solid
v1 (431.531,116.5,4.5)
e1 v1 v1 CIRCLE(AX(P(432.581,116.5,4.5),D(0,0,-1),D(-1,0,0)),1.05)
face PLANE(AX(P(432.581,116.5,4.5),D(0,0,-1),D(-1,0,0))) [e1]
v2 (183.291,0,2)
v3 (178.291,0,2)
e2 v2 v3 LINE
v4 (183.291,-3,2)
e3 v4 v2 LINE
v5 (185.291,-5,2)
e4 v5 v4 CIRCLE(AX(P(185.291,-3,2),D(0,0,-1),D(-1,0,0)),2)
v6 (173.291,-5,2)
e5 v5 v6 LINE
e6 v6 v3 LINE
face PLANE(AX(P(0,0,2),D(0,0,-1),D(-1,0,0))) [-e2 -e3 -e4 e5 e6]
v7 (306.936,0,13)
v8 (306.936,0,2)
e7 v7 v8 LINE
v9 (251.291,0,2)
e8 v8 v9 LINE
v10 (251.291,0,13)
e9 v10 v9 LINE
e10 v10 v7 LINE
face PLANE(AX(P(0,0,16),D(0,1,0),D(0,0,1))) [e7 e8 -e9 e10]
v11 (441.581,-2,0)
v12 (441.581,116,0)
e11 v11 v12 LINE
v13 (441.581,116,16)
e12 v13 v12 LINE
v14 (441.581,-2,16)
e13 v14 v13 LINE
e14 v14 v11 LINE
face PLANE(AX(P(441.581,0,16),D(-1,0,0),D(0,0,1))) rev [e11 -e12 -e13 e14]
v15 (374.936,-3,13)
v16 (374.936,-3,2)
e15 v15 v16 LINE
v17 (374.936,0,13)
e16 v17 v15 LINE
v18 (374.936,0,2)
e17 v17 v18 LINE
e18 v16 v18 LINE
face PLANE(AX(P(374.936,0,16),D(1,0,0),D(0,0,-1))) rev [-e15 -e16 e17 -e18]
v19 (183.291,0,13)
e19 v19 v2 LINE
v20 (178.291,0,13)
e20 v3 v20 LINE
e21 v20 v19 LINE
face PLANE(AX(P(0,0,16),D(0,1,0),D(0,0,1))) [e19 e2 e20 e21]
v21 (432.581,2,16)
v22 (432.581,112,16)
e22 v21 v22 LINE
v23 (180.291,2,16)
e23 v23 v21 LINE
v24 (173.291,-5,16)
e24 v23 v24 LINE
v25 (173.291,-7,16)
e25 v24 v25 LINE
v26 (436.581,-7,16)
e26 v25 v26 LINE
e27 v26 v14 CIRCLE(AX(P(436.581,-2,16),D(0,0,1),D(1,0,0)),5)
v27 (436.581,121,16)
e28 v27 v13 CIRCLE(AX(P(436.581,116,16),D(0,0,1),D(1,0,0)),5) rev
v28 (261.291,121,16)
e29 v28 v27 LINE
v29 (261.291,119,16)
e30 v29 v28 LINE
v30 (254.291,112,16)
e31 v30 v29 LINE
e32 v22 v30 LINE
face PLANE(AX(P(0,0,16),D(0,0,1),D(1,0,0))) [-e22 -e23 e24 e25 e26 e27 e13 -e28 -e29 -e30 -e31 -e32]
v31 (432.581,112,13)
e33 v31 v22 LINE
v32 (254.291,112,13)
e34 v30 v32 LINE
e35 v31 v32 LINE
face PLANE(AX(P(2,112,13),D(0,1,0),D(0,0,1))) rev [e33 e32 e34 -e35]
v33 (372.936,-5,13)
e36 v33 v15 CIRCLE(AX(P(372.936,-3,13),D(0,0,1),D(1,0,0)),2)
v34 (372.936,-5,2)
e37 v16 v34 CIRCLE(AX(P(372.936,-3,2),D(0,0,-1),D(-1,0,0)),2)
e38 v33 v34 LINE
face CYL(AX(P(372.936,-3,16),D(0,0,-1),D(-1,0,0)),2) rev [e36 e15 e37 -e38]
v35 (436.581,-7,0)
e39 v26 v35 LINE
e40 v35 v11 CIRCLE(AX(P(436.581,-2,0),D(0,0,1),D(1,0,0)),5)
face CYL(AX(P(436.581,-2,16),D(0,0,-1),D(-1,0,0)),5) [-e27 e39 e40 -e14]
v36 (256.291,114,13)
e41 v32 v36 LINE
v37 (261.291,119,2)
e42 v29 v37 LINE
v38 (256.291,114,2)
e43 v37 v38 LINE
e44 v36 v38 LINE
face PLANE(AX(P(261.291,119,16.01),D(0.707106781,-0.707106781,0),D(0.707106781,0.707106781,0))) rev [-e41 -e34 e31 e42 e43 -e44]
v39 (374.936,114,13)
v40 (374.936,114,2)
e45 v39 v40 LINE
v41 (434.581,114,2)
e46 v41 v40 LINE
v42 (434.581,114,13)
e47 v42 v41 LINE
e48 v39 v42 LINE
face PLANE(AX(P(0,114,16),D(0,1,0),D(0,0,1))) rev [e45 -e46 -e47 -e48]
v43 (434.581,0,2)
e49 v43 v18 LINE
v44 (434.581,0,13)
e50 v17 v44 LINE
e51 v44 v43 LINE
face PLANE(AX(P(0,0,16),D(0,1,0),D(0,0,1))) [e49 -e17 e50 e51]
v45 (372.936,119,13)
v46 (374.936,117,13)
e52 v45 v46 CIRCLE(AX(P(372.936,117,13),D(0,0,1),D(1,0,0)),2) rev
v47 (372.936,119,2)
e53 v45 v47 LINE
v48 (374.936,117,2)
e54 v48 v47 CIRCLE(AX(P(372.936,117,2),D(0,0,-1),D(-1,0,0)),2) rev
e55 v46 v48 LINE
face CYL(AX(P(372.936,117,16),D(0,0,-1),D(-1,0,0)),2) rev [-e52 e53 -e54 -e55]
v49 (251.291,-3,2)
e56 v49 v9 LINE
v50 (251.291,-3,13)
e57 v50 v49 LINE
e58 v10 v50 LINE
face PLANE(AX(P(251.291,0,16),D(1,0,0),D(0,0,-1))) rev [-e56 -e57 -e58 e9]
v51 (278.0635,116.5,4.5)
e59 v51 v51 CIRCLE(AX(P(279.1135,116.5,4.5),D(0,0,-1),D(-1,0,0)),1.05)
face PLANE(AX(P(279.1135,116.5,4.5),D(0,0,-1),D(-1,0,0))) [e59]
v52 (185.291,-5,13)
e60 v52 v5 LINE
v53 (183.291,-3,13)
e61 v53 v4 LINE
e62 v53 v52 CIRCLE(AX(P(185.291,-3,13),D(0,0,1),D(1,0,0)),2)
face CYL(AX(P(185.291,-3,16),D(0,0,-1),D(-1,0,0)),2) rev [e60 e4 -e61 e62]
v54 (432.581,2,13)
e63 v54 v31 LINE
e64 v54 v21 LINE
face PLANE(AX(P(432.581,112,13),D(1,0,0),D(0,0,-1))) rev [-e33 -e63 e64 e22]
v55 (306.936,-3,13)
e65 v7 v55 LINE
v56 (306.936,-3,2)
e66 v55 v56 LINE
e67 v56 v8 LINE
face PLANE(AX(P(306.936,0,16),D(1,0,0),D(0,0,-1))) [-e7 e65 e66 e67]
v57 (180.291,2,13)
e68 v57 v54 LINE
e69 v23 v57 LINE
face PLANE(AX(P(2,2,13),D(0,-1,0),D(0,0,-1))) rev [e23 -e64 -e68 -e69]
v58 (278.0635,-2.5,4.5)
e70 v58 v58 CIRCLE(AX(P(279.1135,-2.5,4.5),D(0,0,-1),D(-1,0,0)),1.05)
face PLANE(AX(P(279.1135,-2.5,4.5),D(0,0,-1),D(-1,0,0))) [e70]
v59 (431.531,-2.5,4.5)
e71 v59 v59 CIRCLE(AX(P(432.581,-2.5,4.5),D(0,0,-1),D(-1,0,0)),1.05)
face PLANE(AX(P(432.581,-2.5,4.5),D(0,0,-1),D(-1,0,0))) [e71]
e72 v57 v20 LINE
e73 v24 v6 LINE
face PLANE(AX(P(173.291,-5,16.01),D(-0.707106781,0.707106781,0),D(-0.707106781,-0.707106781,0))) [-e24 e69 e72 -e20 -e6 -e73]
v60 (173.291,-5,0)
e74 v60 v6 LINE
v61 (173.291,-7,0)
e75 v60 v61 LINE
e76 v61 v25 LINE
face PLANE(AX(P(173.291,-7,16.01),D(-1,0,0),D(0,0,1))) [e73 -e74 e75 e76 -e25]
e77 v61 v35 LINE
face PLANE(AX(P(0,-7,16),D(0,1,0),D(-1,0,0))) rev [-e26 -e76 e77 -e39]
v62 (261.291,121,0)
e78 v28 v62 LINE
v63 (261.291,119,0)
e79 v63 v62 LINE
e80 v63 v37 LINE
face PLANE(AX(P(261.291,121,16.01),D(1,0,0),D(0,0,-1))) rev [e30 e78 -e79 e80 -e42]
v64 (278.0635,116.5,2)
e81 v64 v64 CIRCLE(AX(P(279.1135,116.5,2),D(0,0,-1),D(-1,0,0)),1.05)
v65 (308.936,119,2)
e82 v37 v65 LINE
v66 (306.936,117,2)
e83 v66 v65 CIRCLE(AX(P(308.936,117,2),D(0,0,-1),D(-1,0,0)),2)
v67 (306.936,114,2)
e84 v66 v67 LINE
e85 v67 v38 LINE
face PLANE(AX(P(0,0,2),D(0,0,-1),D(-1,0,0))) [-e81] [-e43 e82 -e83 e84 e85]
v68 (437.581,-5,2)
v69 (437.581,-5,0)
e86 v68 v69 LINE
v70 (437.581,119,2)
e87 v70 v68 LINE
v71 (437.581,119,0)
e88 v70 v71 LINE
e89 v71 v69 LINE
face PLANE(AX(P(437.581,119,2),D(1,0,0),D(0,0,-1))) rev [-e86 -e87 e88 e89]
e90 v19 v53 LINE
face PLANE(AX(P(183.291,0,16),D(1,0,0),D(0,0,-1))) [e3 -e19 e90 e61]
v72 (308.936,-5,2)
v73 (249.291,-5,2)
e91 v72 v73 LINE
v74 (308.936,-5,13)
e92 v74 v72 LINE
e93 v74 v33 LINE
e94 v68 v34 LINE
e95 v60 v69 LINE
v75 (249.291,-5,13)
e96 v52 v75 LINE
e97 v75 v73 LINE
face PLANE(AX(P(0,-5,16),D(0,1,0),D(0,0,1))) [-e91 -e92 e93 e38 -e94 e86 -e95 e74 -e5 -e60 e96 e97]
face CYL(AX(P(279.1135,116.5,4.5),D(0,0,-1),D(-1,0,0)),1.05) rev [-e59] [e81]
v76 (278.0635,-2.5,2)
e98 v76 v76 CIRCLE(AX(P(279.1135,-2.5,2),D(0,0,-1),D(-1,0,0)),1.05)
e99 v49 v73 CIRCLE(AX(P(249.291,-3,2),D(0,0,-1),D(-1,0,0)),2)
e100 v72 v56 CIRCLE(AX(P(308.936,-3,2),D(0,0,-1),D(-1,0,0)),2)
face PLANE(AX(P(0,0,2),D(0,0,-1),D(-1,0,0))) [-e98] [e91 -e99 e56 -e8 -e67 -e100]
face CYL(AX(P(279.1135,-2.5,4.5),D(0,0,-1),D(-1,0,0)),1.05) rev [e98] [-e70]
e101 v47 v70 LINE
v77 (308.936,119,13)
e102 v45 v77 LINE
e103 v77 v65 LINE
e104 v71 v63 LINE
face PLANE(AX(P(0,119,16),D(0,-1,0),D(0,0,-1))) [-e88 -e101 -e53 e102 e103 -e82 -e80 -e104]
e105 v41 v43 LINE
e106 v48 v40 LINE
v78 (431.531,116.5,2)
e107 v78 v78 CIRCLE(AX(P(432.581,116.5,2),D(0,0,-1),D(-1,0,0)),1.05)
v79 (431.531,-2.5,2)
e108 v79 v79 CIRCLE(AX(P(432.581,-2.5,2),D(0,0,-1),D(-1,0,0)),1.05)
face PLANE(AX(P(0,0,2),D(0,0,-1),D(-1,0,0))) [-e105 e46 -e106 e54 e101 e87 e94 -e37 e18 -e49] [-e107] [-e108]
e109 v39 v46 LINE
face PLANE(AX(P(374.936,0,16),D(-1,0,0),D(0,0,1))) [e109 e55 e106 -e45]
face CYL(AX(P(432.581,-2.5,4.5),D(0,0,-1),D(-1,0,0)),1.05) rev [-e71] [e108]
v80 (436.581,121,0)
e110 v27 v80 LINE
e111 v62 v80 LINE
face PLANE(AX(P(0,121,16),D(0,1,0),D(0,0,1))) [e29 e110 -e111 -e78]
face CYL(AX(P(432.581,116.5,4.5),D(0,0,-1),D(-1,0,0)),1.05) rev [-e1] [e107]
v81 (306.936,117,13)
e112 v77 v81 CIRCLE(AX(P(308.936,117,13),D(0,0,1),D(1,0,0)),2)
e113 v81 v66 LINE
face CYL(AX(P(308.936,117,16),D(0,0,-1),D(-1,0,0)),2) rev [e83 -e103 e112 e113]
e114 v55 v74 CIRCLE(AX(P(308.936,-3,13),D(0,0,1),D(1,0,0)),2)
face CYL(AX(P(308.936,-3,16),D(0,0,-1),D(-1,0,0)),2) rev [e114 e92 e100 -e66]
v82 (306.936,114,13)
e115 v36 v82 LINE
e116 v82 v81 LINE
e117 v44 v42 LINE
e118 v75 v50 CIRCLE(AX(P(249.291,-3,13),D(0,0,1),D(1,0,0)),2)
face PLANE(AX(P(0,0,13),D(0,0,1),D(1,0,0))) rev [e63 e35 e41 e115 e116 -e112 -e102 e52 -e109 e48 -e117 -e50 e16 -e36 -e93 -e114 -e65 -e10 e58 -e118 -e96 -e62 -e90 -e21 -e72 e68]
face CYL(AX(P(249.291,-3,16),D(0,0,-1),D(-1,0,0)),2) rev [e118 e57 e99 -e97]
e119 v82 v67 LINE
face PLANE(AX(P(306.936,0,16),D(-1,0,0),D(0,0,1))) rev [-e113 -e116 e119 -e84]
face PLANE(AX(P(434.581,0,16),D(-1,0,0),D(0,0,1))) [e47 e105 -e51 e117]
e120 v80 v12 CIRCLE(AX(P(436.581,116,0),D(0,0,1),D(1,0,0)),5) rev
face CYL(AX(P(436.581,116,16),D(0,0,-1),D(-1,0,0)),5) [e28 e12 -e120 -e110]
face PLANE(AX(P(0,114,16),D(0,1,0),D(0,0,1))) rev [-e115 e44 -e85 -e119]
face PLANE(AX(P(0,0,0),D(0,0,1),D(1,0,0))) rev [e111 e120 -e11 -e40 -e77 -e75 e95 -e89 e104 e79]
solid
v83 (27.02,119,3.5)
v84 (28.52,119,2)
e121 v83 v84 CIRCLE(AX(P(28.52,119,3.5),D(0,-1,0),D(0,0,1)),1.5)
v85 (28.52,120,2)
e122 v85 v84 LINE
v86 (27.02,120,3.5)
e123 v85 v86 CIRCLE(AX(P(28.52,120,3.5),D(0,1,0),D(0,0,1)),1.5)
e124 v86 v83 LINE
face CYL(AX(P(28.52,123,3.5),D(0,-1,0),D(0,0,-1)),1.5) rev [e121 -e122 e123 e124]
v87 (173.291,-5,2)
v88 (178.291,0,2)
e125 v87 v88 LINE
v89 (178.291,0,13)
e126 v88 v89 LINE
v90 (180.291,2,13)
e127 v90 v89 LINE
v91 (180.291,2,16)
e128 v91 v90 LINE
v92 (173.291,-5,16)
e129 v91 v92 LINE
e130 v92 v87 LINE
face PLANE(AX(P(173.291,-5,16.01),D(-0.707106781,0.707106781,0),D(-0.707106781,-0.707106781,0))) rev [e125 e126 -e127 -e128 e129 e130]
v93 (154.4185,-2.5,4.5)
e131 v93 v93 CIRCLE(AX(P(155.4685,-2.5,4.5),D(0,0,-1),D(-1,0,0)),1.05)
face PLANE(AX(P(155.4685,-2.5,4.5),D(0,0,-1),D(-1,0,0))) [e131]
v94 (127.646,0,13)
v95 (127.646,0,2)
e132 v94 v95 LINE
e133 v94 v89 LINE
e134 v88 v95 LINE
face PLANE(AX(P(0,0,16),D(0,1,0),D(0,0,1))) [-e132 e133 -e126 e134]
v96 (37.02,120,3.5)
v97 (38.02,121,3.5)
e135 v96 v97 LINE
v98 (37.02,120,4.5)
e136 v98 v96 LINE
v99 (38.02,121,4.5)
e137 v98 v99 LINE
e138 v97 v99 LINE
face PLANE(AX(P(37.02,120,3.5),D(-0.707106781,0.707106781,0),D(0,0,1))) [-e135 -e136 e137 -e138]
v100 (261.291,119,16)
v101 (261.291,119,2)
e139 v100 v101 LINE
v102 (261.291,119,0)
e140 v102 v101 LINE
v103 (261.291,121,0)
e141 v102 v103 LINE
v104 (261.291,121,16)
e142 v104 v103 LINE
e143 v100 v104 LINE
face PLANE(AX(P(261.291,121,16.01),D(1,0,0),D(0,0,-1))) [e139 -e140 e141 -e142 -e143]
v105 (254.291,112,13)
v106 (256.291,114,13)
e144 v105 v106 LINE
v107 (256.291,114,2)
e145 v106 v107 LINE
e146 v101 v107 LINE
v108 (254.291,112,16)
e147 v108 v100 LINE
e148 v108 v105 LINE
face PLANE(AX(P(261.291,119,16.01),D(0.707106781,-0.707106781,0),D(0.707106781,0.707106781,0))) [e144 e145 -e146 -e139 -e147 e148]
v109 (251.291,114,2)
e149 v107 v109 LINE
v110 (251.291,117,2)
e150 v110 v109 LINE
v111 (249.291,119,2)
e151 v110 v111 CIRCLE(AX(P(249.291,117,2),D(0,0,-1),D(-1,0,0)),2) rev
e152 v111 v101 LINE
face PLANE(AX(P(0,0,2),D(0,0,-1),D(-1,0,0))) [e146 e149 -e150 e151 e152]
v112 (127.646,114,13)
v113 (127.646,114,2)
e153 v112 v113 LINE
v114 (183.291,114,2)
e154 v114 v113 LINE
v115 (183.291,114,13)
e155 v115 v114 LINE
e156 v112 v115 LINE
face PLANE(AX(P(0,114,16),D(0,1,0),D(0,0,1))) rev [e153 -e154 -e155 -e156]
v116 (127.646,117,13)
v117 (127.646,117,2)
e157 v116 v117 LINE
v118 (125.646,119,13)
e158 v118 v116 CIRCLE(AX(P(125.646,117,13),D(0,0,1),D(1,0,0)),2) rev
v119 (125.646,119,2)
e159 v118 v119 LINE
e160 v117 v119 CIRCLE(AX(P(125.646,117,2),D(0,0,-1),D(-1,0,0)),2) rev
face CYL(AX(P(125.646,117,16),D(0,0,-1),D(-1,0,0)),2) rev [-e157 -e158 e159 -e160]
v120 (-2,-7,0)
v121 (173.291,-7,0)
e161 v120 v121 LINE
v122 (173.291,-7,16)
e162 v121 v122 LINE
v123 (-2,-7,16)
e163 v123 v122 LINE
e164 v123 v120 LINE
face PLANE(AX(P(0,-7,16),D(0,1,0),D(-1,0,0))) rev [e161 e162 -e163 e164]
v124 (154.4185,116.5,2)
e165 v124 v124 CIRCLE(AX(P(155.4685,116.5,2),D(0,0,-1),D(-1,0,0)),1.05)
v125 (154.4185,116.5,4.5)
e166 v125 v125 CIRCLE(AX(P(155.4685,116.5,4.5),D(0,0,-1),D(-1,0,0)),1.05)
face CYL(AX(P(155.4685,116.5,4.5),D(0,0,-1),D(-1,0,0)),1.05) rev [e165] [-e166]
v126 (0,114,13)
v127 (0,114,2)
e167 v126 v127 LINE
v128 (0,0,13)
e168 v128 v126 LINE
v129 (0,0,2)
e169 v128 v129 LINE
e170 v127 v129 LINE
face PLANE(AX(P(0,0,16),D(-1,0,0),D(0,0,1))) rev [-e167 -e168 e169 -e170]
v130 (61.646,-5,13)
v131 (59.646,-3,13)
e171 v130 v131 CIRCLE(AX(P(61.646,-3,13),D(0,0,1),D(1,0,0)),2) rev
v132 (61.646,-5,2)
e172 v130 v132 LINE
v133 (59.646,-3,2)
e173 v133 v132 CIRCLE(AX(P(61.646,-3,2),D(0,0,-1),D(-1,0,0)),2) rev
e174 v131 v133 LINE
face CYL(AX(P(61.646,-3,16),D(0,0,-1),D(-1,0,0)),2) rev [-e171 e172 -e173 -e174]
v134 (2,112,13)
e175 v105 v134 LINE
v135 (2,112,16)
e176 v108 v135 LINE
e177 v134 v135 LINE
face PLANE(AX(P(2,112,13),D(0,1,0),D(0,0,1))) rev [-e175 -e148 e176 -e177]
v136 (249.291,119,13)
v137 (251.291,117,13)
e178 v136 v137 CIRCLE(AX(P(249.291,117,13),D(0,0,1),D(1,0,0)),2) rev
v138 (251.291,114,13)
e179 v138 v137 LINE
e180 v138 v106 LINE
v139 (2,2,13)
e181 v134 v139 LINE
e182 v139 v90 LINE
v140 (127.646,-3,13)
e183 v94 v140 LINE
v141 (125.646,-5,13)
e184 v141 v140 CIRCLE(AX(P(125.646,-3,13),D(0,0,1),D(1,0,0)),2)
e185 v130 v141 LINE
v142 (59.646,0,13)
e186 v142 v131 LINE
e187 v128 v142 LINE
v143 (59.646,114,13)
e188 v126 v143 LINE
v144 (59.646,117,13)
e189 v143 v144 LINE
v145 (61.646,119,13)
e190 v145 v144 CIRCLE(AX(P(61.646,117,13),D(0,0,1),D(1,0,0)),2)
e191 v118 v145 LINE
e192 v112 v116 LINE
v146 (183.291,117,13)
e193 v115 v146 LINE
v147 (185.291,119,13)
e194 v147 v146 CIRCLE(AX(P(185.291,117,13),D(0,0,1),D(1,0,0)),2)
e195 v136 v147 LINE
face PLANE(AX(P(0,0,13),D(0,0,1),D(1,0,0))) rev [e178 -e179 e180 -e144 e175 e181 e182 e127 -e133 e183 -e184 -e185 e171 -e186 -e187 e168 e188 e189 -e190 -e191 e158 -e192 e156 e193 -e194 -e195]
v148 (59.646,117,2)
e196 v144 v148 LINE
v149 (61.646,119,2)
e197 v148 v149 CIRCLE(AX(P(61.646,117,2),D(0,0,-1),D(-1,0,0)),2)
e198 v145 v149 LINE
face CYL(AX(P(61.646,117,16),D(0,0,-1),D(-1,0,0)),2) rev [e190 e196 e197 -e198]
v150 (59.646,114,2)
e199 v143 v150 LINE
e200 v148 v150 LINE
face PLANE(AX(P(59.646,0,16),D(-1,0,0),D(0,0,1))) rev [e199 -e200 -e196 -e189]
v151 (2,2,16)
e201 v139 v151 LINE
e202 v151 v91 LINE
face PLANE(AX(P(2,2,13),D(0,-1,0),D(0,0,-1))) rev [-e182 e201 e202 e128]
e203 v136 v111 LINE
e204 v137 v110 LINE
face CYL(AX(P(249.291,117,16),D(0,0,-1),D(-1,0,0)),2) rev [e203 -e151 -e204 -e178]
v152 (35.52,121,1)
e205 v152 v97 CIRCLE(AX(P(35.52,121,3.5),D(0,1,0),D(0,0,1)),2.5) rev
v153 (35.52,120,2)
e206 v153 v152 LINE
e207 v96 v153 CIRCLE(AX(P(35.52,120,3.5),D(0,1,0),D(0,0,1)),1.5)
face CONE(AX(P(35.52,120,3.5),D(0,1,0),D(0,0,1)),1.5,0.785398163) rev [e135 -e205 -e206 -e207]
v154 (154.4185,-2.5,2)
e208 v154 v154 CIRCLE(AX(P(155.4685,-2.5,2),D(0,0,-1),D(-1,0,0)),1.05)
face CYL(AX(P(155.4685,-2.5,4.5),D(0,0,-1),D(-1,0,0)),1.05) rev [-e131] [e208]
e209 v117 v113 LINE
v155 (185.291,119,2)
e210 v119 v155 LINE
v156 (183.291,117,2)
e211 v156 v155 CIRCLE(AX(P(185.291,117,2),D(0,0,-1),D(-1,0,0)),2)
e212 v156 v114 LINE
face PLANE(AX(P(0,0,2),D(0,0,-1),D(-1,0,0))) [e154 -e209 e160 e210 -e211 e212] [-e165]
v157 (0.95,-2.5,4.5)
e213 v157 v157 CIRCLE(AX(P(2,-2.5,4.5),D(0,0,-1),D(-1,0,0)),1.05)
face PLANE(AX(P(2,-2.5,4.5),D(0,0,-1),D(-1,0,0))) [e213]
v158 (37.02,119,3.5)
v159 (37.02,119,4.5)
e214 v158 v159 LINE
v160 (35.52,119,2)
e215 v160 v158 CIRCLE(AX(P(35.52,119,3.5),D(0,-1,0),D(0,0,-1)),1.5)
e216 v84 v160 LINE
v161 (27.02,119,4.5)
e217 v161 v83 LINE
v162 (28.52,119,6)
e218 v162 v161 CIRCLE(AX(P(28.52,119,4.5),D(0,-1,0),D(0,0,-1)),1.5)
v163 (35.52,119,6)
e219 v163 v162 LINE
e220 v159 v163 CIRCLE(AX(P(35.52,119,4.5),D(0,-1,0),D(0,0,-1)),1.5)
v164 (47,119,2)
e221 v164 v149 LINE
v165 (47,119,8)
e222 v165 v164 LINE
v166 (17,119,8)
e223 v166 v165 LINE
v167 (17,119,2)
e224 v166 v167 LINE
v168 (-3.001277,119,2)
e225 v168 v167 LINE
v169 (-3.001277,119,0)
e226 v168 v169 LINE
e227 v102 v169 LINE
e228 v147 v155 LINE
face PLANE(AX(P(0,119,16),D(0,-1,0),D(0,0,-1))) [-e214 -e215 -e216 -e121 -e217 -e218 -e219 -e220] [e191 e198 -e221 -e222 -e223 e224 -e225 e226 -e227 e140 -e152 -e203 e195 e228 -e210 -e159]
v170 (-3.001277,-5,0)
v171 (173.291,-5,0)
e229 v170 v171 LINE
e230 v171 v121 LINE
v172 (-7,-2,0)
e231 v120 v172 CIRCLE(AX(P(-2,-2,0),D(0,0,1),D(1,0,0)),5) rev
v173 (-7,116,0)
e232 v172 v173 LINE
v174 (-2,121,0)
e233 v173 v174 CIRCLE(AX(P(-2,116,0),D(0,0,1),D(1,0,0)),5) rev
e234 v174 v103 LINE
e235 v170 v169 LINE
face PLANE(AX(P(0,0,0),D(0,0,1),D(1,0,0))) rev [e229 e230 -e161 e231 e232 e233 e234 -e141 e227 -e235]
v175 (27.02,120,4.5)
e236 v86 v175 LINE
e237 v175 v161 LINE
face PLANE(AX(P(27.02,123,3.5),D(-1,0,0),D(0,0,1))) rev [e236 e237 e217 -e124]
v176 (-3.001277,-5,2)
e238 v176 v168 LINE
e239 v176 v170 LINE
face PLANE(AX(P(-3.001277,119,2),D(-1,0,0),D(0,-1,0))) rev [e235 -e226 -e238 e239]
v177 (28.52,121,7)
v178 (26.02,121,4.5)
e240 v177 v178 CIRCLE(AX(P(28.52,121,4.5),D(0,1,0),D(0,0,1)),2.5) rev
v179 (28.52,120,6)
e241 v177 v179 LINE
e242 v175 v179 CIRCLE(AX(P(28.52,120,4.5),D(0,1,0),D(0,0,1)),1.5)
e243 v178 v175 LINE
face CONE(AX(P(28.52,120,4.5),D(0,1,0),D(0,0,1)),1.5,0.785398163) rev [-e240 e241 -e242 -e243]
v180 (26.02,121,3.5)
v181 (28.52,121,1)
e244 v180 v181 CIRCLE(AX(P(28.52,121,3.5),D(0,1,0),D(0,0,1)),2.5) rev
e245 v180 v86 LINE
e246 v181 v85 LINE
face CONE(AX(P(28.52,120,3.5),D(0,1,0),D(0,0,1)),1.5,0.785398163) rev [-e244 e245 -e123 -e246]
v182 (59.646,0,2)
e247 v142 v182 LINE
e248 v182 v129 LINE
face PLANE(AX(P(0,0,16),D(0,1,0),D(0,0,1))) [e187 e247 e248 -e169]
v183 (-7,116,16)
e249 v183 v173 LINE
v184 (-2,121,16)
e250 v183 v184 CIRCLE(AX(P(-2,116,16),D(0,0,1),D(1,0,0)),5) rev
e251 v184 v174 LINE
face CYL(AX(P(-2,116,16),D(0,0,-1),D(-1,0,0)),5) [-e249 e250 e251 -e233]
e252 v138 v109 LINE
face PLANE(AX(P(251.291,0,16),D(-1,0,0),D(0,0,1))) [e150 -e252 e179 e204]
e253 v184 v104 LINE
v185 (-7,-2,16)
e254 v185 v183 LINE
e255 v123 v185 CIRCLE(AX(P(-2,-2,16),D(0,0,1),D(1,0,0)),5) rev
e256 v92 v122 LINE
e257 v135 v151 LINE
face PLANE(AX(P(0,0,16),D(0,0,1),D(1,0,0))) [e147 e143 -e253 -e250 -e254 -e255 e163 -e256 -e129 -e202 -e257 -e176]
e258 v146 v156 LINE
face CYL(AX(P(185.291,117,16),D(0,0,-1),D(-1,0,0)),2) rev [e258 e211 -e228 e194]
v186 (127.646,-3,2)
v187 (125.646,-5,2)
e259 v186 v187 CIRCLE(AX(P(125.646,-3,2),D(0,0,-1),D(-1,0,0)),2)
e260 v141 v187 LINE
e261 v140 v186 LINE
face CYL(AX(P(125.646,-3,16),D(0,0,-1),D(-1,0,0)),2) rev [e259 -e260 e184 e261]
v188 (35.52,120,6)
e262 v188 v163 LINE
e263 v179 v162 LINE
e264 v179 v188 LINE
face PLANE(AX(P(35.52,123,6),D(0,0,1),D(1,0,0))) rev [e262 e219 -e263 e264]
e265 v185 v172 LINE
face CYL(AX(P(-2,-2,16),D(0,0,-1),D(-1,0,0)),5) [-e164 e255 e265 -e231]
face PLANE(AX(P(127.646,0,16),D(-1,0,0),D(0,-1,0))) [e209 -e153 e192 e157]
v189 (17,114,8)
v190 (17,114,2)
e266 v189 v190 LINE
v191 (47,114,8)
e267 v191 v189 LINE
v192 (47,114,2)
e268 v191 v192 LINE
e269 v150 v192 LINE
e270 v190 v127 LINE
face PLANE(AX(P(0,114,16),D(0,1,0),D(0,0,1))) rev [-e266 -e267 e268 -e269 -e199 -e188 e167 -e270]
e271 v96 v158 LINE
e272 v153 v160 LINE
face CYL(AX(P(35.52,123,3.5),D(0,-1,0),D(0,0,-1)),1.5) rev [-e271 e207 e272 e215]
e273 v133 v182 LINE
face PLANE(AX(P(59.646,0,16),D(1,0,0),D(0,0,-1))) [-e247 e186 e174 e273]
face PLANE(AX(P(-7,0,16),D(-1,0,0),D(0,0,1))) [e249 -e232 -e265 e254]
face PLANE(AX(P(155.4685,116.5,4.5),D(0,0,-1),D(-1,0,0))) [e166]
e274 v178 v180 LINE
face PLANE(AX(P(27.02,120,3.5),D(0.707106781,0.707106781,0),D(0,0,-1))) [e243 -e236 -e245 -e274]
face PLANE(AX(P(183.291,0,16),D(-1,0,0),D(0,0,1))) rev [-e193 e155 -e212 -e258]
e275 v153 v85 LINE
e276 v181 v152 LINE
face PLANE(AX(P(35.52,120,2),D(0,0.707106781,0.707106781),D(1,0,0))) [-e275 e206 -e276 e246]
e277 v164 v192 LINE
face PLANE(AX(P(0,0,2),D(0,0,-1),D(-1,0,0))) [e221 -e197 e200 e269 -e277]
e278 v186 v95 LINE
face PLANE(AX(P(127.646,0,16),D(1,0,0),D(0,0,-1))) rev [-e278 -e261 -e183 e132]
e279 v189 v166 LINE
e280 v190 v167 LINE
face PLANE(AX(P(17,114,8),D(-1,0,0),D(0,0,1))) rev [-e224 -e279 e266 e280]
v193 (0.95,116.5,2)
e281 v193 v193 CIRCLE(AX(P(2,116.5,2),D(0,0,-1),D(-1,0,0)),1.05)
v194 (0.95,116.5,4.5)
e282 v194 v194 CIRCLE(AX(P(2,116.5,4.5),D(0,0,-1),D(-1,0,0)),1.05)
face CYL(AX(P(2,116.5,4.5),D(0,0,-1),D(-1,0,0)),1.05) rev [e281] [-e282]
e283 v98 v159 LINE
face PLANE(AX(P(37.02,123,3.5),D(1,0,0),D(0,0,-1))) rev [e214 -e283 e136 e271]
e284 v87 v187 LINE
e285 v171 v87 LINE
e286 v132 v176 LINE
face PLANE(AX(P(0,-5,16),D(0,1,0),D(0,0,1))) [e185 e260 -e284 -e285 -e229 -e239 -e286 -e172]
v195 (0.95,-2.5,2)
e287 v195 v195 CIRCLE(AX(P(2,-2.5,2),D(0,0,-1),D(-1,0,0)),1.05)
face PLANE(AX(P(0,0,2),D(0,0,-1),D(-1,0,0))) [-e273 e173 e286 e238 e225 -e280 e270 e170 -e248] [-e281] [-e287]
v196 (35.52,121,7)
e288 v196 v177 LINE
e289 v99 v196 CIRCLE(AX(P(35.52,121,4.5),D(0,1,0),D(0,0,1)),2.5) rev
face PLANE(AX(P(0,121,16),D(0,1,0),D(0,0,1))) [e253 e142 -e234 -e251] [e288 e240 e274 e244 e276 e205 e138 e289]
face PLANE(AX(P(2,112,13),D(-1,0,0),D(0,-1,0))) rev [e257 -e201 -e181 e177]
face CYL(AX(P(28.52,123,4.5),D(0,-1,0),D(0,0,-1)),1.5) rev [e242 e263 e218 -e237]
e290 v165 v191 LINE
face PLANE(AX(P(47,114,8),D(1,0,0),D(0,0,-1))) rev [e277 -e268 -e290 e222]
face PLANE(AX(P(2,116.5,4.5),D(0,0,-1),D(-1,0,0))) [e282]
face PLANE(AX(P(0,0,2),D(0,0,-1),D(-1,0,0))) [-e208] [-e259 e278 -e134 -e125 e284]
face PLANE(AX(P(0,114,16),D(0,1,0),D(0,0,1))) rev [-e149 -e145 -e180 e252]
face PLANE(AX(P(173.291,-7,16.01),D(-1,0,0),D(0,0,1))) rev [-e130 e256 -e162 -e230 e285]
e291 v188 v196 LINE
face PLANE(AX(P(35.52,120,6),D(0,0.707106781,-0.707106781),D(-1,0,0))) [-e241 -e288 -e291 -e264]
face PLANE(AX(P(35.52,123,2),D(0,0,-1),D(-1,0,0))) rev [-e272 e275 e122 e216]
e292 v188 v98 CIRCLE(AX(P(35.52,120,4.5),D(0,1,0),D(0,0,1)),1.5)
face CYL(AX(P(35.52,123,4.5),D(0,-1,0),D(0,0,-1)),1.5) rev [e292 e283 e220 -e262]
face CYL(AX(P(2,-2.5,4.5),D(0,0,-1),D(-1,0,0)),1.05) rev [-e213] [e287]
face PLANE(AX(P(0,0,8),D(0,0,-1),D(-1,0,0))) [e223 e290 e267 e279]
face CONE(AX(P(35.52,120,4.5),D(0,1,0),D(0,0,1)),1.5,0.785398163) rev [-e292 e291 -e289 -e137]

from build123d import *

# Parameters (mm, degrees)
BOSS_EXTRUDE1_DEPTH = 16
SKETCH2_W           = 438.581
SKETCH2_H           = 128
SKETCH2_W_2         = 430.581
SKETCH2_H_2         = 110
BOSS_EXTRUDE2_DEPTH = 3
SKETCH3_W           = 440.5822769
SKETCH3_H           = 124
CUT_EXTRUDE1_DEPTH  = 2
SKETCH4_R           = 1.05
CUT_EXTRUDE2_DEPTH  = 2.5
SKETCH5_W           = 30
SKETCH5_H           = 5
CUT_EXTRUDE3_DEPTH  = 6
CUT_EXTRUDE4_DEPTH  = 4
CHAMFER8_SIZE       = 1
SPLIT1_DEPTH        = 16
SPLIT1_START        = 2
SPLIT1_2_OUTLINE_R  = 1.05
SPLIT1_2_DEPTH      = 14
SPLIT1_START_2      = 13
SPLIT1_3_OUTLINE_R  = 1.05
SPLIT1_3_DEPTH      = 3
SPLIT1_4_DEPTH      = 3.5
SPLIT1_START_3      = 8
SPLIT1_5_OUTLINE_R  = 1.05
SPLIT1_5_DEPTH      = 5
SPLIT1_START_4      = 4.5
SPLIT1_6_OUTLINE_R  = 1.05
SPLIT1_6_DEPTH      = 3.5
SPLIT1_START_5      = 118
SPLIT1_7_DEPTH      = 4


with BuildPart() as part:
    # Sketch1 → Boss-Extrude1 (new body)
    with BuildSketch(Plane.XY):
        with BuildLine():
            ThreePointArc((-7, -2), (-5.535533906, -5.535533906), (-2, -7))
            Line((-2, -7), (436.581, -7))
            ThreePointArc((436.581, -7), (440.116533906, -5.535533906), (441.581, -2))
            Line((441.581, -2), (441.581, 116))
            ThreePointArc((441.581, 116), (440.116533906, 119.535533906), (436.581, 121))
            Line((436.581, 121), (-2, 121))
            ThreePointArc((-2, 121), (-5.535533906, 119.535533906), (-7, 116))
            Line((-7, 116), (-7, -2))
        make_face()
        with BuildLine():
            Line((251.291, 114), (306.936, 114))
            Line((306.936, 114), (306.936, 117))
            ThreePointArc((306.936, 117), (307.521786438, 118.414213562), (308.936, 119))
            Line((308.936, 119), (372.936, 119))
            ThreePointArc((372.936, 119), (374.350213562, 118.414213562), (374.936, 117))
            Line((374.936, 117), (374.936, 114))
            Line((374.936, 114), (434.581, 114))
            Line((434.581, 114), (434.581, 0))
            Line((434.581, 0), (374.936, 0))
            Line((374.936, 0), (374.936, -3))
            ThreePointArc((374.936, -3), (374.350213562, -4.414213562), (372.936, -5))
            Line((372.936, -5), (308.936, -5))
            ThreePointArc((308.936, -5), (307.521786438, -4.414213562), (306.936, -3))
            Line((306.936, -3), (306.936, 0))
            Line((306.936, 0), (251.291, 0))
            Line((251.291, 0), (251.291, -3))
            ThreePointArc((251.291, -3), (250.705213562, -4.414213562), (249.291, -5))
            Line((249.291, -5), (185.291, -5))
            ThreePointArc((185.291, -5), (183.876786438, -4.414213562), (183.291, -3))
            Line((183.291, -3), (183.291, 0))
            Line((183.291, 0), (127.646, 0))
            Line((127.646, 0), (127.646, -3))
            ThreePointArc((127.646, -3), (127.060213562, -4.414213562), (125.646, -5))
            Line((125.646, -5), (61.646, -5))
            ThreePointArc((61.646, -5), (60.231786438, -4.414213562), (59.646, -3))
            Line((59.646, -3), (59.646, 0))
            Line((59.646, 0), (0, 0))
            Line((0, 0), (0, 114))
            Line((0, 114), (59.646, 114))
            Line((59.646, 114), (59.646, 117))
            ThreePointArc((59.646, 117), (60.231786438, 118.414213562), (61.646, 119))
            Line((61.646, 119), (125.646, 119))
            ThreePointArc((125.646, 119), (127.060213562, 118.414213562), (127.646, 117))
            Line((127.646, 117), (127.646, 114))
            Line((127.646, 114), (183.291, 114))
            Line((183.291, 114), (183.291, 117))
            ThreePointArc((183.291, 117), (183.876786438, 118.414213562), (185.291, 119))
            Line((185.291, 119), (249.291, 119))
            ThreePointArc((249.291, 119), (250.705213562, 118.414213562), (251.291, 117))
            Line((251.291, 117), (251.291, 114))
        make_face(mode=Mode.SUBTRACT)
    extrude(amount=BOSS_EXTRUDE1_DEPTH)

    # Sketch2 → Boss-Extrude2 (add)
    with BuildSketch(Plane.XY.offset(16)):
        with Locations((217.2905, 57)):
            Rectangle(SKETCH2_W, SKETCH2_H)
        with Locations((217.2905, 57)):
            Rectangle(SKETCH2_W_2, SKETCH2_H_2, mode=Mode.SUBTRACT)
    extrude(amount=-BOSS_EXTRUDE2_DEPTH)

    # Sketch3 → Cut-Extrude1 (cut)
    with BuildSketch(Plane(origin=(0, 0, 0), x_dir=(-1, 0, 0), z_dir=(0, 0, -1))):
        with Locations((-217.28986155, 57)):
            Rectangle(SKETCH3_W, SKETCH3_H)
    extrude(amount=-CUT_EXTRUDE1_DEPTH, mode=Mode.SUBTRACT)

    # Sketch4 → Cut-Extrude2 (cut)
    with BuildSketch(Plane(origin=(0, 0, 2), x_dir=(-1, 0, 0), z_dir=(0, 0, -1))):
        with Locations((-279.1135, 116.5)):
            Circle(SKETCH4_R)
        with Locations((-155.4685, 116.5)):
            Circle(SKETCH4_R)
        with Locations((-279.1135, -2.5)):
            Circle(SKETCH4_R)
        with Locations((-155.4685, -2.5)):
            Circle(SKETCH4_R)
        with Locations((-2, -2.5)):
            Circle(SKETCH4_R)
        with Locations((-2, 116.5)):
            Circle(SKETCH4_R)
        with Locations((-432.581, 116.5)):
            Circle(SKETCH4_R)
        with Locations((-432.581, -2.5)):
            Circle(SKETCH4_R)
    extrude(amount=-CUT_EXTRUDE2_DEPTH, mode=Mode.SUBTRACT)

    # Sketch5 → Cut-Extrude3 (cut)
    with BuildSketch(Plane(origin=(0, 0, 2), x_dir=(-1, 0, 0), z_dir=(0, 0, -1))):
        with Locations((-32, 116.5)):
            Rectangle(SKETCH5_W, SKETCH5_H)
    extrude(amount=-CUT_EXTRUDE3_DEPTH, mode=Mode.SUBTRACT)

    # Sketch6 → Cut-Extrude4 (cut)
    with BuildSketch(Plane.XZ.offset(-119)):
        with BuildLine():
            Line((35.52, 2), (28.52, 2))
            ThreePointArc((28.52, 2), (27.459339828, 2.439339828), (27.02, 3.5))
            Line((27.02, 3.5), (27.02, 4.5))
            ThreePointArc((27.02, 4.5), (27.459339828, 5.560660172), (28.52, 6))
            Line((28.52, 6), (35.52, 6))
            ThreePointArc((35.52, 6), (36.580660172, 5.560660172), (37.02, 4.5))
            Line((37.02, 4.5), (37.02, 3.5))
            ThreePointArc((37.02, 3.5), (36.580660172, 2.439339828), (35.52, 2))
        make_face()
    extrude(amount=-CUT_EXTRUDE4_DEPTH, mode=Mode.SUBTRACT)

    # Chamfer8
    chamfer8_edges = [part.edges().sort_by_distance(p)[0] for p in [
        (32.02, 121, 6),
        (27.459339828, 121, 5.560660172),
        (27.02, 121, 4),
        (27.459339828, 121, 2.439339828),
        (32.02, 121, 2),
        (36.580660172, 121, 2.439339828),
        (37.02, 121, 4),
        (36.580660172, 121, 5.560660172),
    ]]
    chamfer(chamfer8_edges, length=CHAMFER8_SIZE)

    # Split1: read off the stored shape, not the designer's step
    # Split1 outline → Split1 (cut)
    with BuildSketch(Plane.XY):
        with BuildLine():
            Line((261.291, 121), (-2, 121))
            ThreePointArc((-2, 121), (-5.535533906, 119.535533906), (-7, 116))
            Line((-7, 116), (-7, -2))
            ThreePointArc((-7, -2), (-5.535533906, -5.535533906), (-2, -7))
            Line((-2, -7), (173.291, -7))
            Line((173.291, -7), (173.291, -5))
            Line((173.291, -5), (180.291, 2))
            Line((180.291, 2), (2, 2))
            Line((2, 2), (2, 112))
            Line((2, 112), (254.291, 112))
            Line((254.291, 112), (261.291, 119))
            Line((261.291, 119), (261.291, 121))
        make_face()
    extrude(amount=SPLIT1_DEPTH, mode=Mode.SUBTRACT)


with BuildPart() as body_2:
    # Split1 2 outline → Split1 2 (new body)
    # profile 1 of 2: a face of its own
    with BuildSketch(Plane.XY.offset(SPLIT1_START)):
        with BuildLine():
            ThreePointArc((127.646, -3), (127.060213562, -4.414213562), (125.646, -5))
            Line((125.646, -5), (61.646, -5))
            ThreePointArc((61.646, -5), (60.231786438, -4.414213562), (59.646, -3))
            Line((59.646, -3), (59.646, 0))
            Line((59.646, 0), (0, 0))
            Line((0, 0), (0, 114))
            Line((0, 114), (17, 114))
            Line((17, 114), (17, 119))
            Line((17, 119), (27.02, 119))
            Line((27.02, 119), (27.02, 120))
            Line((27.02, 120), (26.02, 121))
            Line((26.02, 121), (-2, 121))
            ThreePointArc((-2, 121), (-5.535533906, 119.535533906), (-7, 116))
            Line((-7, 116), (-7, -2))
            ThreePointArc((-7, -2), (-5.535533906, -5.535533906), (-2, -7))
            Line((-2, -7), (173.291, -7))
            Line((173.291, -7), (173.291, -5))
            Line((173.291, -5), (178.291, 0))
            Line((178.291, 0), (127.646, 0))
            Line((127.646, 0), (127.646, -3))
        make_face()
        with Locations((155.4685, -2.5)):
            Circle(SPLIT1_2_OUTLINE_R, mode=Mode.SUBTRACT)
        with Locations((2, -2.5)):
            Circle(SPLIT1_2_OUTLINE_R, mode=Mode.SUBTRACT)
        with Locations((2, 116.5)):
            Circle(SPLIT1_2_OUTLINE_R, mode=Mode.SUBTRACT)
    # profile 2 of 2: a face of its own
    with BuildSketch(Plane.XY.offset(SPLIT1_START)):
        with BuildLine():
            Line((251.291, 114), (256.291, 114))
            Line((256.291, 114), (261.291, 119))
            Line((261.291, 119), (261.291, 121))
            Line((261.291, 121), (38.02, 121))
            Line((38.02, 121), (37.02, 120))
            Line((37.02, 120), (37.02, 119))
            Line((37.02, 119), (47, 119))
            Line((47, 119), (47, 114))
            Line((47, 114), (59.646, 114))
            Line((59.646, 114), (59.646, 117))
            ThreePointArc((59.646, 117), (60.231786438, 118.414213562), (61.646, 119))
            Line((61.646, 119), (125.646, 119))
            ThreePointArc((125.646, 119), (127.060213562, 118.414213562), (127.646, 117))
            Line((127.646, 117), (127.646, 114))
            Line((127.646, 114), (183.291, 114))
            Line((183.291, 114), (183.291, 117))
            ThreePointArc((183.291, 117), (183.876786438, 118.414213562), (185.291, 119))
            Line((185.291, 119), (249.291, 119))
            ThreePointArc((249.291, 119), (250.705213562, 118.414213562), (251.291, 117))
            Line((251.291, 117), (251.291, 114))
        make_face()
        with Locations((155.4685, 116.5)):
            Circle(SPLIT1_2_OUTLINE_R, mode=Mode.SUBTRACT)
    extrude(amount=SPLIT1_2_DEPTH)

    # Split1 3 outline → Split1 3 (add)
    with BuildSketch(Plane.XY.offset(SPLIT1_START_2)):
        with BuildLine():
            Line((127.646, 0), (178.291, 0))
            Line((178.291, 0), (180.291, 2))
            Line((180.291, 2), (2, 2))
            Line((2, 2), (2, 112))
            Line((2, 112), (254.291, 112))
            Line((254.291, 112), (256.291, 114))
            Line((256.291, 114), (251.291, 114))
            Line((251.291, 114), (251.291, 117))
            ThreePointArc((251.291, 117), (250.705213562, 118.414213562), (249.291, 119))
            Line((249.291, 119), (185.291, 119))
            ThreePointArc((185.291, 119), (183.876786438, 118.414213562), (183.291, 117))
            Line((183.291, 117), (183.291, 114))
            Line((183.291, 114), (127.646, 114))
            Line((127.646, 114), (127.646, 117))
            ThreePointArc((127.646, 117), (127.060213562, 118.414213562), (125.646, 119))
            Line((125.646, 119), (61.646, 119))
            ThreePointArc((61.646, 119), (60.231786438, 118.414213562), (59.646, 117))
            Line((59.646, 117), (59.646, 114))
            Line((59.646, 114), (47, 114))
            Line((47, 114), (47, 119))
            Line((47, 119), (37.02, 119))
            Line((37.02, 119), (37.02, 120))
            Line((37.02, 120), (38.02, 121))
            Line((38.02, 121), (26.02, 121))
            Line((26.02, 121), (27.02, 120))
            Line((27.02, 120), (27.02, 119))
            Line((27.02, 119), (17, 119))
            Line((17, 119), (17, 114))
            Line((17, 114), (0, 114))
            Line((0, 114), (0, 0))
            Line((0, 0), (59.646, 0))
            Line((59.646, 0), (59.646, -3))
            ThreePointArc((59.646, -3), (60.231786438, -4.414213562), (61.646, -5))
            Line((61.646, -5), (125.646, -5))
            ThreePointArc((125.646, -5), (127.060213562, -4.414213562), (127.646, -3))
            Line((127.646, -3), (127.646, 0))
        make_face()
        with Locations((155.4685, 116.5)):
            Circle(SPLIT1_3_OUTLINE_R)
        with Locations((2, 116.5)):
            Circle(SPLIT1_3_OUTLINE_R)
        with Locations((2, -2.5)):
            Circle(SPLIT1_3_OUTLINE_R)
        with Locations((155.4685, -2.5)):
            Circle(SPLIT1_3_OUTLINE_R)
    extrude(amount=SPLIT1_3_DEPTH)

    # Split1 4 outline → Split1 4 (add)
    with BuildSketch(Plane.XY):
        with BuildLine():
            Line((173.291, -7), (173.291, -5))
            Line((173.291, -5), (-3.0012769, -5))
            Line((-3.0012769, -5), (-3.0012769, 119))
            Line((-3.0012769, 119), (261.291, 119))
            Line((261.291, 119), (261.291, 121))
            Line((261.291, 121), (-2, 121))
            ThreePointArc((-2, 121), (-5.535533906, 119.535533906), (-7, 116))
            Line((-7, 116), (-7, -2))
            ThreePointArc((-7, -2), (-5.535533906, -5.535533906), (-2, -7))
            Line((-2, -7), (173.291, -7))
        make_face()
    extrude(amount=SPLIT1_4_DEPTH)

    # Split1 5 outline → Split1 5 (add)
    with BuildSketch(Plane.XY.offset(SPLIT1_START_3)):
        Polygon((27.02, 119), (17, 119), (17, 114), (47, 114), (47, 119), (37.02, 119), (37.02, 120), (38.02, 121), (26.02, 121), (27.02, 120), align=None)
        with Locations((155.4685, 116.5)):
            Circle(SPLIT1_5_OUTLINE_R)
        with Locations((2, 116.5)):
            Circle(SPLIT1_5_OUTLINE_R)
        with Locations((2, -2.5)):
            Circle(SPLIT1_5_OUTLINE_R)
        with Locations((155.4685, -2.5)):
            Circle(SPLIT1_5_OUTLINE_R)
    extrude(amount=SPLIT1_5_DEPTH)

    # Split1 6 outline → Split1 6 (add)
    with BuildSketch(Plane.XY.offset(SPLIT1_START_4)):
        Polygon((38.02, 121), (26.02, 121), (27.02, 120), (27.02, 119), (37.02, 119), (37.02, 120), align=None)
        with Locations((155.4685, 116.5)):
            Circle(SPLIT1_6_OUTLINE_R)
        with Locations((2, 116.5)):
            Circle(SPLIT1_6_OUTLINE_R)
        with Locations((2, -2.5)):
            Circle(SPLIT1_6_OUTLINE_R)
        with Locations((155.4685, -2.5)):
            Circle(SPLIT1_6_OUTLINE_R)
    extrude(amount=SPLIT1_6_DEPTH)

    # Split1 7 outline → Split1 7 (cut)
    with BuildSketch(Plane(origin=(0, 0, 0), x_dir=(1, 0, 0), z_dir=(0, 1, 0)).offset(SPLIT1_START_5)):
        with BuildLine():
            ThreePointArc((27.02, -4.5), (27.459339828, -5.560660172), (28.52, -6))
            Line((28.52, -6), (35.52, -6))
            ThreePointArc((35.52, -6), (36.580660172, -5.560660172), (37.02, -4.5))
            Line((37.02, -4.5), (27.02, -4.5))
        make_face()
        with BuildLine():
            ThreePointArc((28.52, -2), (27.459339828, -2.439339828), (27.02, -3.5))
            Line((27.02, -3.5), (37.02, -3.5))
            ThreePointArc((37.02, -3.5), (36.580660172, -2.439339828), (35.52, -2))
            Line((35.52, -2), (28.52, -2))
        make_face()
    extrude(amount=SPLIT1_7_DEPTH, mode=Mode.SUBTRACT)

    # Split1 8: loft between two sections, ruled curve by curve
    split1_8_from = [
        Edge.make_three_point_arc((27.02, 120, 4.5), (27.459339828, 120, 5.560660172), (28.52, 120, 6)),
        Edge.make_three_point_arc((35.52, 120, 6), (36.580660172, 120, 5.560660172), (37.02, 120, 4.5)),
        Edge.make_line((28.52, 120, 6), (35.52, 120, 6)),
        Edge.make_line((37.02, 120, 4.5), (27.02, 120, 4.5)),
    ]
    split1_8_to = [
        Edge.make_three_point_arc((26.02, 121, 4.5), (26.752233047, 121, 6.267766953), (28.52, 121, 7)),
        Edge.make_three_point_arc((35.52, 121, 7), (37.287766953, 121, 6.267766953), (38.02, 121, 4.5)),
        Edge.make_line((28.52, 121, 7), (35.52, 121, 7)),
        Edge.make_line((38.02, 121, 4.5), (26.02, 121, 4.5)),
    ]
    split1_8 = Solid(Shell([*[Face.make_surface_from_curves(split1_8_from[k], split1_8_to[k]) for k in range(4)], Face(Wire(split1_8_from)), Face(Wire(split1_8_to))]))
    add(split1_8, mode=Mode.SUBTRACT)

    # Split1 9: loft between two sections, ruled curve by curve
    split1_9_from = [
        Edge.make_three_point_arc((37.02, 120, 3.5), (36.580660172, 120, 2.439339828), (35.52, 120, 2)),
        Edge.make_three_point_arc((28.52, 120, 2), (27.459339828, 120, 2.439339828), (27.02, 120, 3.5)),
        Edge.make_line((35.52, 120, 2), (28.52, 120, 2)),
        Edge.make_line((27.02, 120, 3.5), (37.02, 120, 3.5)),
    ]
    split1_9_to = [
        Edge.make_three_point_arc((38.02, 121, 3.5), (37.287766953, 121, 1.732233047), (35.52, 121, 1)),
        Edge.make_three_point_arc((28.52, 121, 1), (26.752233047, 121, 1.732233047), (26.02, 121, 3.5)),
        Edge.make_line((35.52, 121, 1), (28.52, 121, 1)),
        Edge.make_line((26.02, 121, 3.5), (38.02, 121, 3.5)),
    ]
    split1_9 = Solid(Shell([*[Face.make_surface_from_curves(split1_9_from[k], split1_9_to[k]) for k in range(4)], Face(Wire(split1_9_from)), Face(Wire(split1_9_to))]))
    add(split1_9, mode=Mode.SUBTRACT)


solid = Compound([part.part, body_2.part])
